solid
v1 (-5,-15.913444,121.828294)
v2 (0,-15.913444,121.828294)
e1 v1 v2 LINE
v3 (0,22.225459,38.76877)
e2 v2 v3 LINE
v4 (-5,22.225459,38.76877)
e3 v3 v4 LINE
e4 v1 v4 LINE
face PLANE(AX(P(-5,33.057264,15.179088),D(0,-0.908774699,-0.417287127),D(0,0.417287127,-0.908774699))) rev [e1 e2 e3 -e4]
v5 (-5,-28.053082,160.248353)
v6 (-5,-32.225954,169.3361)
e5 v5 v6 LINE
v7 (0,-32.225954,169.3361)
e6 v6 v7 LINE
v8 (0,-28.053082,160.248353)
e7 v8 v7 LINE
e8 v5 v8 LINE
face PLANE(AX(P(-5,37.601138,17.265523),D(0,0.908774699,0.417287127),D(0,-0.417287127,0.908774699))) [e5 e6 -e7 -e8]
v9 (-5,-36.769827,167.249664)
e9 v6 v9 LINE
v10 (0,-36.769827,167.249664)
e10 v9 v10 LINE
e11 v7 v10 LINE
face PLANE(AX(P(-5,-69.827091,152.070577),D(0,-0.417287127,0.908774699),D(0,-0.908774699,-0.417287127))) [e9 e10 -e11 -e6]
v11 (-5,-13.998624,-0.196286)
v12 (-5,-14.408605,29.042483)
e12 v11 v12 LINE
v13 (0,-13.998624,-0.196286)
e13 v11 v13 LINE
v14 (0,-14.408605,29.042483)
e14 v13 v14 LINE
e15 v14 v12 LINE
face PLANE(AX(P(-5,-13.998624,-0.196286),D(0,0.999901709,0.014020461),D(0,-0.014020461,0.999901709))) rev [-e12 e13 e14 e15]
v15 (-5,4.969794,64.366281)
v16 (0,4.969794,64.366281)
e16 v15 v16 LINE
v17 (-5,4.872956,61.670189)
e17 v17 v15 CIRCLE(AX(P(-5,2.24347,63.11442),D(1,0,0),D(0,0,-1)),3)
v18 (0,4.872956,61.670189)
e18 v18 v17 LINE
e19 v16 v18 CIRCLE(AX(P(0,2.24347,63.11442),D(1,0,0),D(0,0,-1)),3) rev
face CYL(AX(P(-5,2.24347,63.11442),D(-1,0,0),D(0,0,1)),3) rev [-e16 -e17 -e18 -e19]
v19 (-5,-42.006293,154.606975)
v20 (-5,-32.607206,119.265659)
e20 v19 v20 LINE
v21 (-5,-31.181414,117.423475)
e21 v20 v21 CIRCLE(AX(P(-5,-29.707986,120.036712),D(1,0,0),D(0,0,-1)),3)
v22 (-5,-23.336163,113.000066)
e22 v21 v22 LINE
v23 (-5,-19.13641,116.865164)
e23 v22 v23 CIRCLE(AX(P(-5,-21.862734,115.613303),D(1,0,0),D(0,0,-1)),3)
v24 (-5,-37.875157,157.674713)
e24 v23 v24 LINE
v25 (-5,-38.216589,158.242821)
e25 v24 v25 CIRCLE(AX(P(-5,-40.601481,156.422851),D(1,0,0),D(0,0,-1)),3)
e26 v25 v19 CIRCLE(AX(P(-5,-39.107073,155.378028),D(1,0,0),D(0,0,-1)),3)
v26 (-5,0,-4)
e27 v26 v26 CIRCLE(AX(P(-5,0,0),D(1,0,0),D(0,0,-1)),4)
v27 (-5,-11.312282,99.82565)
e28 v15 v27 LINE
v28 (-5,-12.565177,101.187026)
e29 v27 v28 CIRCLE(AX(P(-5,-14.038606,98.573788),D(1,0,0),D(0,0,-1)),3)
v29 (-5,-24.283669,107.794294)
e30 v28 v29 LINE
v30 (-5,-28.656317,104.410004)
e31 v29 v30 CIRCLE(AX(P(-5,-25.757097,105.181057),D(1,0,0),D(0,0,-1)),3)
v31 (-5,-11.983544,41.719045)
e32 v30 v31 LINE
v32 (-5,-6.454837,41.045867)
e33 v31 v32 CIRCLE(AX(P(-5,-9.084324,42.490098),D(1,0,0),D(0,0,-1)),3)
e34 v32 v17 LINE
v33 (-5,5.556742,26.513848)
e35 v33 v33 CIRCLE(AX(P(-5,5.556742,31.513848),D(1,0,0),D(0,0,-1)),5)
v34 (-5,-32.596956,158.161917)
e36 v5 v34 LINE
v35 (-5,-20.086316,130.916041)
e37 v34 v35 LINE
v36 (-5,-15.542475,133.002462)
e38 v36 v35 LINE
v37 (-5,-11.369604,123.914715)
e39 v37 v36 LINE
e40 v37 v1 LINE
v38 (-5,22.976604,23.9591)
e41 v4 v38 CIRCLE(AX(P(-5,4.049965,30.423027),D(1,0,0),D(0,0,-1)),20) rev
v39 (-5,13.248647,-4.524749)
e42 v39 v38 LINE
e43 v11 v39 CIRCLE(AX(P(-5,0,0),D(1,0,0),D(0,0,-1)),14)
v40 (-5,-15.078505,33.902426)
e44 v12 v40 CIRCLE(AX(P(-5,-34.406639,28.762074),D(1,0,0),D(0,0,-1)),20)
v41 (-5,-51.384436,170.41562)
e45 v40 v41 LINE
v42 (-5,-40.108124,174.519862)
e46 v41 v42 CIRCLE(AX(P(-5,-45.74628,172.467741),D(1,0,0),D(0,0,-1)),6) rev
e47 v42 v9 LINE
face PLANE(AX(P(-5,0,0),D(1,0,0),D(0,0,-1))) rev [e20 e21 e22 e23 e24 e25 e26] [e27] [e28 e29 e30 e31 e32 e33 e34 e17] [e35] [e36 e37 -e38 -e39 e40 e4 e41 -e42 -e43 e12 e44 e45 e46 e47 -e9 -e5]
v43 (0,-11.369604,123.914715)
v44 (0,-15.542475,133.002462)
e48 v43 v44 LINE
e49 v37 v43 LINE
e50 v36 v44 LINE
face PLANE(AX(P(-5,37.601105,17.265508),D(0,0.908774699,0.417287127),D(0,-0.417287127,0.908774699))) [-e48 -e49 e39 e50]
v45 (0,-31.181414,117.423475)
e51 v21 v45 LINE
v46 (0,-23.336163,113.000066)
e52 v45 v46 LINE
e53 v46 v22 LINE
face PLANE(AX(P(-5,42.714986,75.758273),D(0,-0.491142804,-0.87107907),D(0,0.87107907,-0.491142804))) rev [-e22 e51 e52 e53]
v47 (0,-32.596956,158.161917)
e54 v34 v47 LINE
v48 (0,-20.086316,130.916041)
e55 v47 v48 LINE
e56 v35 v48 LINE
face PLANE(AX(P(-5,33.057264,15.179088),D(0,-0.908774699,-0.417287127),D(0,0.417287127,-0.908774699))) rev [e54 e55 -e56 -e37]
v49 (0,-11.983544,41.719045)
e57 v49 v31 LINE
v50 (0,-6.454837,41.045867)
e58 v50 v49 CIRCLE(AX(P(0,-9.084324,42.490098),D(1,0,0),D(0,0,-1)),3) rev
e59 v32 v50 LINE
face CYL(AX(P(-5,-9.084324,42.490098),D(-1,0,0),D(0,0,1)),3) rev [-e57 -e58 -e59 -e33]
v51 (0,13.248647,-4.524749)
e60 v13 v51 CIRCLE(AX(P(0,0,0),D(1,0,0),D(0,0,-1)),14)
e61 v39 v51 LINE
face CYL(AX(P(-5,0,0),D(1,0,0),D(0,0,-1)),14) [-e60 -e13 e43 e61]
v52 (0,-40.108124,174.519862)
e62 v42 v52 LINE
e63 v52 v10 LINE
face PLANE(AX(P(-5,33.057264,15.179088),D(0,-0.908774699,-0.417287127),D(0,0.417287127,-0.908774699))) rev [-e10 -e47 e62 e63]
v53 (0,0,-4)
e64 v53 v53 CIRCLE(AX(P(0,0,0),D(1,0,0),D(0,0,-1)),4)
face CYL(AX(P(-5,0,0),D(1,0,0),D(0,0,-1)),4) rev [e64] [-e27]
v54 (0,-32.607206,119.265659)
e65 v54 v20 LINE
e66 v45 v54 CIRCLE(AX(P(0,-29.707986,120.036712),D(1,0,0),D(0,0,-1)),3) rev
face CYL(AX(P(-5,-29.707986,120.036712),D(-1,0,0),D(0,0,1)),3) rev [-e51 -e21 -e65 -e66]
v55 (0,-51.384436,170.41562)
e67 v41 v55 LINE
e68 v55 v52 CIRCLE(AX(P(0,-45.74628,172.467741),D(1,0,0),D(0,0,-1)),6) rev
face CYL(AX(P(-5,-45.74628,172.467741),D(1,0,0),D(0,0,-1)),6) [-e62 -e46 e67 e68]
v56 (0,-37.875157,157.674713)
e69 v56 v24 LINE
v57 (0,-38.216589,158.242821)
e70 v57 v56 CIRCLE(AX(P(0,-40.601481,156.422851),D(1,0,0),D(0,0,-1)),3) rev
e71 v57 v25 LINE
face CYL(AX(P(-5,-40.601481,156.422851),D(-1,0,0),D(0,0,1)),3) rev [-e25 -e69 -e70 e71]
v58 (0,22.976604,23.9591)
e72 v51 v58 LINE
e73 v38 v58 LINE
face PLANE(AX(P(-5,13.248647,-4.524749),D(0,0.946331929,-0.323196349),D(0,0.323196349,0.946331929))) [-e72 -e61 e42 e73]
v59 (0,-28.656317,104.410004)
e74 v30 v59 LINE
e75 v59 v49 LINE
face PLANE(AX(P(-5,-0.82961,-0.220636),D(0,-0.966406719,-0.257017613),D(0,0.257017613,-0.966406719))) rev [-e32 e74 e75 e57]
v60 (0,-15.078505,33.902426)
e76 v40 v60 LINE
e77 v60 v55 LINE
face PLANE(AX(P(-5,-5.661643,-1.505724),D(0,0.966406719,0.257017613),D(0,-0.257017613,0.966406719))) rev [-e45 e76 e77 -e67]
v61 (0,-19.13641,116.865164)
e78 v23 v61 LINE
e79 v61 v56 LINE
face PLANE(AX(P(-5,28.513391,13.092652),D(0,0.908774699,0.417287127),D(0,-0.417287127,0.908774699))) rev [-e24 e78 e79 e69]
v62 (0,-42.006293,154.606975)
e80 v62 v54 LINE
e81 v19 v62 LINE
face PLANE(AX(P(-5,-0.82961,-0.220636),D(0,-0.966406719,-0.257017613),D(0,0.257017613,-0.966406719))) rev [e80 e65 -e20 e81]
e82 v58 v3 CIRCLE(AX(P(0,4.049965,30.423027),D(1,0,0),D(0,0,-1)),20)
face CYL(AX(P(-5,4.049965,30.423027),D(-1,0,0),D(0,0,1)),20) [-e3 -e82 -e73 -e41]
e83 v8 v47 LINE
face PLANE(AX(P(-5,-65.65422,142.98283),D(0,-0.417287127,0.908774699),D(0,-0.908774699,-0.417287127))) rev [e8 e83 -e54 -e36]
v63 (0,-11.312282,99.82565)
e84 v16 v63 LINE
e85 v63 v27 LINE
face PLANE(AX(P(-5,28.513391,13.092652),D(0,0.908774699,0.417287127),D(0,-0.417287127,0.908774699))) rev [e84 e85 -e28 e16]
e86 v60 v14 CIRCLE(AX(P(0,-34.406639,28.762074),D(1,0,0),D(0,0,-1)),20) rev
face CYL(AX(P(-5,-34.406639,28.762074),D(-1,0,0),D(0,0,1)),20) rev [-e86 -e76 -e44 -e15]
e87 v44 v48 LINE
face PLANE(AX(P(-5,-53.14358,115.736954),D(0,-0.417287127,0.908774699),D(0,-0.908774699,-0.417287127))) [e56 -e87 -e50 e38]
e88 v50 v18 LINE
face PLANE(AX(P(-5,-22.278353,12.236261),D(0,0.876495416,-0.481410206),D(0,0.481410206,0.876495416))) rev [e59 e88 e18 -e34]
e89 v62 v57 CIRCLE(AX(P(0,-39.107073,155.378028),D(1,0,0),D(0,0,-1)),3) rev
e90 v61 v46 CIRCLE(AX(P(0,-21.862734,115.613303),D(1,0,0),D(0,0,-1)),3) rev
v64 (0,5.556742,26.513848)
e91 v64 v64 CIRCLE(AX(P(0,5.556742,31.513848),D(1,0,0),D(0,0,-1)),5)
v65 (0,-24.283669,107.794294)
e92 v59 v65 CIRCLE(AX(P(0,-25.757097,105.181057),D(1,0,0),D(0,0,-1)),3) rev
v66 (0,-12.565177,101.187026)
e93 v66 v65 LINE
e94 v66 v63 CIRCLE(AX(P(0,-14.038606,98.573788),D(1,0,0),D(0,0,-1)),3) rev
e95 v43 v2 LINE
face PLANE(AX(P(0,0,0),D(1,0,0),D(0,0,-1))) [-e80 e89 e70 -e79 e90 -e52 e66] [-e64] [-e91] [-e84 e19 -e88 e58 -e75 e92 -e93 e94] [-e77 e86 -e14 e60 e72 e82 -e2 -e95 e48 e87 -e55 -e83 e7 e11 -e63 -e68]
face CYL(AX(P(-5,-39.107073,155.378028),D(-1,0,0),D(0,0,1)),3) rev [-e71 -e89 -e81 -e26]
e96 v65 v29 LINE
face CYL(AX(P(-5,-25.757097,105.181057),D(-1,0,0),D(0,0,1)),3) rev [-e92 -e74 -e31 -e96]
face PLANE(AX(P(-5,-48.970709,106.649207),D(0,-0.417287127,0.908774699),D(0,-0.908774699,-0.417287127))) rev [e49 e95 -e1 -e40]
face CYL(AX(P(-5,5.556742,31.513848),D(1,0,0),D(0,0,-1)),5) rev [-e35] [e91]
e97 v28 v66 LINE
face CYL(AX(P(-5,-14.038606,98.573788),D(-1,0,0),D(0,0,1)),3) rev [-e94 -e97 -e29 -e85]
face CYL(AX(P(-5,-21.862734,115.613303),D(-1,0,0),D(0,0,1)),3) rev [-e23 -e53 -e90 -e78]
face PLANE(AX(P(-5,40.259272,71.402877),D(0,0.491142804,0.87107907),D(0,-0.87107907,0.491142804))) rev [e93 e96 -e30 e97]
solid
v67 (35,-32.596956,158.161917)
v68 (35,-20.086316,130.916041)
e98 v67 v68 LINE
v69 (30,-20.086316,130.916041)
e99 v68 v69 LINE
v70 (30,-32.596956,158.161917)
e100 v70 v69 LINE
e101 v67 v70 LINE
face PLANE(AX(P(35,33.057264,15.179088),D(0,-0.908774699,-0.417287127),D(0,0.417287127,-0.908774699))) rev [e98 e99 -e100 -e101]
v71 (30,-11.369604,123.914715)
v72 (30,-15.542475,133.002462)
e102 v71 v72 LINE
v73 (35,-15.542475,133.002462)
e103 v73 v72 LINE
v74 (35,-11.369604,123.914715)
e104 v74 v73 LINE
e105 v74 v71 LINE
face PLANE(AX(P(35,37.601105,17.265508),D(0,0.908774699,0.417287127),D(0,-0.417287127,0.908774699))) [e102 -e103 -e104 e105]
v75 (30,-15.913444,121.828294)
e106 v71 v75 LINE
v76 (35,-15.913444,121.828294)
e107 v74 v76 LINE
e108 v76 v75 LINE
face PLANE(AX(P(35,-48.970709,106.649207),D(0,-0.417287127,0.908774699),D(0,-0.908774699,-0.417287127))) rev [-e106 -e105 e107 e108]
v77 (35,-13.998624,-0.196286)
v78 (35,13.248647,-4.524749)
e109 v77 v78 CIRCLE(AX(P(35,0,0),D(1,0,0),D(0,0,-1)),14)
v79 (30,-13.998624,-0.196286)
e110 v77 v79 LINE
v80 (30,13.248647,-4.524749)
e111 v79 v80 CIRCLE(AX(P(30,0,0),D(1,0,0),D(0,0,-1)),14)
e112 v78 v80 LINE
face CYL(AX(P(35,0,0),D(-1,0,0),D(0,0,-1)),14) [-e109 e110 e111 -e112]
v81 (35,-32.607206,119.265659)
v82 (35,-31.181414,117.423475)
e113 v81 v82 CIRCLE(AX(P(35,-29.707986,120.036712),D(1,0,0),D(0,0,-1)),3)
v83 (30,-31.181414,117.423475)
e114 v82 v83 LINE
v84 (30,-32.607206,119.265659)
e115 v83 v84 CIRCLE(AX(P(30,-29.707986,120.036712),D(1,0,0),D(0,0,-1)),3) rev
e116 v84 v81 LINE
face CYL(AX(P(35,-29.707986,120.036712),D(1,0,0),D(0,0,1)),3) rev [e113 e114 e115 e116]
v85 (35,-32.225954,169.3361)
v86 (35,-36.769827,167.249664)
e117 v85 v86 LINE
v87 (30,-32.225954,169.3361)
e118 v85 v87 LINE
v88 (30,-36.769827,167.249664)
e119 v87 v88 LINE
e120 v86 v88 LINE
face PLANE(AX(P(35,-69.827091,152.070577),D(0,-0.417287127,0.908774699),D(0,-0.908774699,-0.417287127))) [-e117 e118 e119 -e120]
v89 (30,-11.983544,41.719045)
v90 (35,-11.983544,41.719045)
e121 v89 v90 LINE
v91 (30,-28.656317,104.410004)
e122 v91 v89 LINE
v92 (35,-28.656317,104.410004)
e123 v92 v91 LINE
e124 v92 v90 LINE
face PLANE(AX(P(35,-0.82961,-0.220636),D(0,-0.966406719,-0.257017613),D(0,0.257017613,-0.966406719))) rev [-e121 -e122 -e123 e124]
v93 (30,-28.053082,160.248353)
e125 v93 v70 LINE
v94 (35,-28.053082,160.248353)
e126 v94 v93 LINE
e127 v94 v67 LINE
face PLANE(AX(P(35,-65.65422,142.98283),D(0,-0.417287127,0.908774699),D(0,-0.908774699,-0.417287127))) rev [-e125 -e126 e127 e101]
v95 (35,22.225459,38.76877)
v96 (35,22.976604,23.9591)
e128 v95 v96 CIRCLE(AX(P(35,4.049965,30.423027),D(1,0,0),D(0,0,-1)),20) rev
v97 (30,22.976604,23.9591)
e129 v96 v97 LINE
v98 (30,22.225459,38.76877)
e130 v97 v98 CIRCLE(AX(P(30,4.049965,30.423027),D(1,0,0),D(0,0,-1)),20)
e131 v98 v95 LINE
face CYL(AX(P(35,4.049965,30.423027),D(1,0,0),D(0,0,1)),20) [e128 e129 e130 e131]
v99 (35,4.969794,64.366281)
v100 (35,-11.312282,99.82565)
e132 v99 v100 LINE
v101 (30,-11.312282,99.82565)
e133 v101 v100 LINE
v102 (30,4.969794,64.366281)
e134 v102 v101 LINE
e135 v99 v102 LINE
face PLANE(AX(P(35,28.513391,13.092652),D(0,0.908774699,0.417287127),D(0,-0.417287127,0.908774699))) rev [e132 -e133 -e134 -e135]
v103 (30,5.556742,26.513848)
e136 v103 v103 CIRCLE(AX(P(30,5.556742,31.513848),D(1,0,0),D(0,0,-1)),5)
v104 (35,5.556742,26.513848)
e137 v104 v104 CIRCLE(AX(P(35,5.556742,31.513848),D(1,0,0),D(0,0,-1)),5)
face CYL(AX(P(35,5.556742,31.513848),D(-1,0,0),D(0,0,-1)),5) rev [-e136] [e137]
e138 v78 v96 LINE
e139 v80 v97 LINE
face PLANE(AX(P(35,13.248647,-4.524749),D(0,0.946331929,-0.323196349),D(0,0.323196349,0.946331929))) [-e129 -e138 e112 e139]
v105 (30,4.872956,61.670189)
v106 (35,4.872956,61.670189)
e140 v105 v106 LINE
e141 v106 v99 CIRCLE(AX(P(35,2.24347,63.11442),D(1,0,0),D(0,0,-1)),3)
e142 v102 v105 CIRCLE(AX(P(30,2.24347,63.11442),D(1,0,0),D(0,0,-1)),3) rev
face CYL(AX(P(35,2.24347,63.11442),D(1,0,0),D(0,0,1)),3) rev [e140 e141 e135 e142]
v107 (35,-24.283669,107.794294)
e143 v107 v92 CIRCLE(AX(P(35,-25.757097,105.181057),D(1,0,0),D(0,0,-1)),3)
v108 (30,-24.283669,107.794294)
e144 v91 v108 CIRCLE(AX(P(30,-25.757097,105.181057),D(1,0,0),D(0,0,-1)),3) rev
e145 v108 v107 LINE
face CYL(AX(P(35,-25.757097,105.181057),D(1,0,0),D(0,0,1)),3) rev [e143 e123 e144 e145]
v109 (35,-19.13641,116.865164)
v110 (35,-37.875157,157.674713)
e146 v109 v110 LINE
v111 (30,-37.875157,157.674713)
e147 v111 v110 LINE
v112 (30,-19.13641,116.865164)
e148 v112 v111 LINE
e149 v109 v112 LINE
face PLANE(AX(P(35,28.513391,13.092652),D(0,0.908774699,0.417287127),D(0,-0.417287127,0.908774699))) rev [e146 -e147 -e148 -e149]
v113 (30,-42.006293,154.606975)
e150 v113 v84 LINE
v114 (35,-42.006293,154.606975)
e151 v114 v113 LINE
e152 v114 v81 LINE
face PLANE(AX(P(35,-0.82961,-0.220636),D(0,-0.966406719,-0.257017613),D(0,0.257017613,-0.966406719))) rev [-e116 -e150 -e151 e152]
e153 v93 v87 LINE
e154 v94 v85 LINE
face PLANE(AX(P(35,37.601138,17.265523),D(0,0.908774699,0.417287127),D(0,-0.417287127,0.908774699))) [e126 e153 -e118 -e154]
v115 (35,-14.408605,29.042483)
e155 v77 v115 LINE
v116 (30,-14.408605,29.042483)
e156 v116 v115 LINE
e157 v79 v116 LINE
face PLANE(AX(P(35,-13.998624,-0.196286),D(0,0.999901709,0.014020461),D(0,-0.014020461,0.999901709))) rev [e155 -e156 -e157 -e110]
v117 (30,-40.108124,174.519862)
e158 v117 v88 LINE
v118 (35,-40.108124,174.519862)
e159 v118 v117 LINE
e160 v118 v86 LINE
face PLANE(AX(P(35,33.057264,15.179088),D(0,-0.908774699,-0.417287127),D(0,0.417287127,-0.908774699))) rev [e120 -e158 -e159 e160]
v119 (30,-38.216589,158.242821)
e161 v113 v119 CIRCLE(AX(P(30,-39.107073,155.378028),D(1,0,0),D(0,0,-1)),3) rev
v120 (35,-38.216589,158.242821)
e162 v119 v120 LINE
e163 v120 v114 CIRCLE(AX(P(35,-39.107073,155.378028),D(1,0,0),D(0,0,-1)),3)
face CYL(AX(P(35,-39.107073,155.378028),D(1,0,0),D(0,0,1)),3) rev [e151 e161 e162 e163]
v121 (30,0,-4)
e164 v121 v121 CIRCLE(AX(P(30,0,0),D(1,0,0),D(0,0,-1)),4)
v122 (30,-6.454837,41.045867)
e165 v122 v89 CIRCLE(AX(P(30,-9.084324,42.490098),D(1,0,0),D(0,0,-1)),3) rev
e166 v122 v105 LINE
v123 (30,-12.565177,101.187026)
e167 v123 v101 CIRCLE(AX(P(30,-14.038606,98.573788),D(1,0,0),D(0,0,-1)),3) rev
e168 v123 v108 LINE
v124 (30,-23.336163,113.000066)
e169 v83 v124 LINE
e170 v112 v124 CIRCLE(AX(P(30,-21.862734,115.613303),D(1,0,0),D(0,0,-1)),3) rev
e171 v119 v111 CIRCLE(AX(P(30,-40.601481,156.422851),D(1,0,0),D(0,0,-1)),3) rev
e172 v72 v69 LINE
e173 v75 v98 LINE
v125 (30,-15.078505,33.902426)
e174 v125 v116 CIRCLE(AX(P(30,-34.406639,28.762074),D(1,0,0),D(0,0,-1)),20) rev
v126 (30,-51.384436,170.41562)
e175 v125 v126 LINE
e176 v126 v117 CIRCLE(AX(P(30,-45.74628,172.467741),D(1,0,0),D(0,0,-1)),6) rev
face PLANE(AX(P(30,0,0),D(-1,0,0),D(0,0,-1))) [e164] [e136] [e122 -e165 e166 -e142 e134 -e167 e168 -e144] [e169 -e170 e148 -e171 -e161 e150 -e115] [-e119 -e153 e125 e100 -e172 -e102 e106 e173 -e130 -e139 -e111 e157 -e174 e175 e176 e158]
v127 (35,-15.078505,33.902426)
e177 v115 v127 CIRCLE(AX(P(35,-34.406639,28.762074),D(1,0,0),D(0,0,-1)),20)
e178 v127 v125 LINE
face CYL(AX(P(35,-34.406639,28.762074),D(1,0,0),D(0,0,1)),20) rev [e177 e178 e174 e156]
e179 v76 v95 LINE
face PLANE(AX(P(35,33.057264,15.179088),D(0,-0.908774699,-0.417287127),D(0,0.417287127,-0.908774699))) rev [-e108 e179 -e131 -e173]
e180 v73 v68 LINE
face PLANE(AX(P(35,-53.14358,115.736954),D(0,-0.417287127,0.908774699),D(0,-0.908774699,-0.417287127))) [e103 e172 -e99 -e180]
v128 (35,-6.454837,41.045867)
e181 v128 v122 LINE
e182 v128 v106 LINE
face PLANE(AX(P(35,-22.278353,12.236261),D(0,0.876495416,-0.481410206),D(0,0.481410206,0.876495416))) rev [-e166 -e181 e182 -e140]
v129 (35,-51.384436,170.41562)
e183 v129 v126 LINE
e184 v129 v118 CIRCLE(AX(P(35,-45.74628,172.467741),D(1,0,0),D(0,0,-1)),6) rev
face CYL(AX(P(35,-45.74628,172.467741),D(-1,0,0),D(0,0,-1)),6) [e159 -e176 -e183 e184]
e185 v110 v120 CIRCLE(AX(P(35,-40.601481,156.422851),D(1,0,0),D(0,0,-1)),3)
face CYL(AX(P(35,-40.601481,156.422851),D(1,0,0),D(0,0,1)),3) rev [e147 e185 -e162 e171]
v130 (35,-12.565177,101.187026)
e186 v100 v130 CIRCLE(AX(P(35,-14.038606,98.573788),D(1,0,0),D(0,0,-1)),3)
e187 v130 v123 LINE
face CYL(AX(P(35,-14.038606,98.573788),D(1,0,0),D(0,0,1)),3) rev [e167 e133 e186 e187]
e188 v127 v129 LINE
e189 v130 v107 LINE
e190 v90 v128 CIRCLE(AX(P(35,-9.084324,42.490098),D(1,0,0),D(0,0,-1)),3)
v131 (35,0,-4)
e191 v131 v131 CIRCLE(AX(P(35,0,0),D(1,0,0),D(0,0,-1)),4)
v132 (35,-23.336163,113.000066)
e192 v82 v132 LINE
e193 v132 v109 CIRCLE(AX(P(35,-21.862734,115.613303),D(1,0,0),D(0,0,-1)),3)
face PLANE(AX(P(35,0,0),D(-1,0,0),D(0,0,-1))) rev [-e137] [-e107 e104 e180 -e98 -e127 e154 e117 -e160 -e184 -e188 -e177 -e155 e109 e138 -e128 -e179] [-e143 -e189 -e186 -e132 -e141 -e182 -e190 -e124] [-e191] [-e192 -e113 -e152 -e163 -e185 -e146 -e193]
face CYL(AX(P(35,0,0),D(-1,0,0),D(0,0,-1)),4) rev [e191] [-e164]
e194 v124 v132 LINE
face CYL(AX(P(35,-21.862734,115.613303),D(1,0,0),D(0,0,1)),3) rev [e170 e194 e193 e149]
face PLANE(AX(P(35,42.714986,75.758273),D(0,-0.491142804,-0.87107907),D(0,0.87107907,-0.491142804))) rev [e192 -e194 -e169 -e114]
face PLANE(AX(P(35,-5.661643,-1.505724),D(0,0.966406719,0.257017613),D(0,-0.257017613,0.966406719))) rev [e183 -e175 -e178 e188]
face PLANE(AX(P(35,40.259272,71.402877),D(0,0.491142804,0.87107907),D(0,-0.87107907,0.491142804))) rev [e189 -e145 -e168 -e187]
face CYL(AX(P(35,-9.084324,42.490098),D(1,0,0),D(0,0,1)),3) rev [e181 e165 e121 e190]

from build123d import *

# Parameters (mm, degrees)
SKETCH1_R           = 4
SKETCH1_R_2         = 5
BOSS_EXTRUDE1_DEPTH = 5
FILLET3_R           = 20
FILLET6_R           = 3


with BuildPart() as part:
    # Sketch1 → Boss-Extrude1 (new body)
    # profile 1 of 3: a face of its own
    with BuildSketch(Plane.YZ):
        with BuildLine():
            Line((-14.443258315, 31.513848096), (-13.998623919, -0.196286448))
            ThreePointArc((-13.998623919, -0.196286448), (-2.196477435, -13.826622396), (13.248647006, -4.52474889))
            Line((13.248647006, -4.52474889), (25.556741685, 31.513848096))
            Line((25.556741685, 31.513848096), (-15.913444308, 121.828294459))
            Line((-15.913444308, 121.828294459), (-17.991906384, 126.354803013))
            Line((-17.991906384, 126.354803013), (-20.086315573, 130.916041451))
            Line((-20.086315573, 130.916041451), (-32.596955812, 158.161917487))
            Line((-32.596955812, 158.161917487), (-34.683391444, 162.705790984))
            Line((-34.683391444, 162.705790984), (-36.769827077, 167.24966448))
            Line((-36.769827077, 167.24966448), (-40.108124089, 174.519862074))
            ThreePointArc((-40.108124089, 174.519862074), (-47.798400673, 178.105896939), (-51.384435538, 170.415620354))
            Line((-51.384435538, 170.415620354), (-14.443258315, 31.513848096))
        make_face()
        with Locations(Location((0, 0, 0), (0, 0, 270))):
            Circle(SKETCH1_R, mode=Mode.SUBTRACT)
        with Locations(Location((5.556741685, 31.513848096, 0), (0, 0, 270))):
            Circle(SKETCH1_R_2, mode=Mode.SUBTRACT)
        Polygon((-10.059219018, 34.483430451), (-30.486505123, 111.291655193), (-11.718080145, 100.709404741), (5.599975549, 62.99386104), align=None, mode=Mode.SUBTRACT)
        Polygon((-38.215011053, 158.414852351), (-15.274502195, 108.454638594), (-32.282363467, 118.044225778), (-44.116299331, 162.540768328), align=None, mode=Mode.SUBTRACT)
    # profile 2 of 3: a face of its own
    with BuildSketch(Plane.YZ):
        Polygon((-17.991906384, 126.354803013), (-15.913444308, 121.828294459), (-11.369603993, 123.914714855), (-15.542475258, 133.002461848), (-20.086315573, 130.916041451), align=None)
    # profile 3 of 3: a face of its own
    with BuildSketch(Plane.YZ):
        Polygon((-32.22595358, 169.336100113), (-36.769827077, 167.24966448), (-34.683391444, 162.705790984), (-32.596955812, 158.161917487), (-28.053082315, 160.24835312), align=None)
    extrude(amount=-BOSS_EXTRUDE1_DEPTH)

    # Fillet3
    fillet3_edges = [part.edges().sort_by_distance(p)[0] for p in [
        (-2.5, 25.556741685, 31.513848096),
        (-2.5, -14.443258315, 31.513848096),
    ]]
    fillet(fillet3_edges, radius=FILLET3_R)

    # Fillet6
    # the kernel refuses this fillet: 3 mm, written as the material it adds along each edge
    with BuildSketch(Plane(origin=(0, -38.215011053, 158.414852351), x_dir=(0, 0.41728712651347166, -0.9087746992770703), z_dir=(-1, 0, 0))) as fillet6_piece_1:
        with BuildLine():
            CenterArc((FILLET6_R * 0.271478941521, FILLET6_R), FILLET6_R, 239.62294962, 30.37705038)
            Line((-FILLET6_R * 0.23420930525, FILLET6_R * 0.137283709973), (0, 0))
            Line((0, 0), (FILLET6_R * 0.271478941521, 0))
        make_face()
    extrude(amount=5)
    with BuildSketch(Plane(origin=(0, -32.282363467, 118.044225778), x_dir=(0, 0.8710790696902164, -0.49114280443433855), z_dir=(-1, 0, 0))) as fillet6_piece_2:
        with BuildLine():
            CenterArc((FILLET6_R * 0.421297147858, -FILLET6_R), FILLET6_R, 90, 45.691106369)
            Line((-FILLET6_R * 0.294287167004, -FILLET6_R * 0.301473630904), (0, 0))
            Line((0, 0), (FILLET6_R * 0.421297147858, 0))
        make_face()
    extrude(amount=5)
    with BuildSketch(Plane(origin=(0, -30.486505123, 111.291655193), x_dir=(0, 0.25701761253564515, -0.9664067191645953), z_dir=(-1, 0, 0))) as fillet6_piece_3:
        with BuildLine():
            CenterArc((FILLET6_R * 2.37362157585, -FILLET6_R), FILLET6_R, 90, 134.308893631)
            Line((FILLET6_R * 1.65803726099, -FILLET6_R * 1.6985263691), (0, 0))
            Line((0, 0), (FILLET6_R * 2.37362157585, 0))
        make_face()
    extrude(amount=5)
    with BuildSketch(Plane(origin=(0, -11.718080145, 100.709404741), x_dir=(0, -0.8710790696902125, 0.4911428044343457), z_dir=(-1, 0, 0))) as fillet6_piece_4:
        with BuildLine():
            CenterArc((FILLET6_R * 0.324156203472, -FILLET6_R), FILLET6_R, 90, 35.920846961)
            Line((-FILLET6_R * 0.262510846562, -FILLET6_R * 0.190171763641), (0, 0))
            Line((0, 0), (FILLET6_R * 0.324156203472, 0))
        make_face()
    extrude(amount=5)
    with BuildSketch(Plane(origin=(0, -10.059219018, 34.483430451), x_dir=(0, -0.2570176125356449, 0.9664067191645953), z_dir=(-1, 0, 0))) as fillet6_piece_5:
        with BuildLine():
            CenterArc((FILLET6_R * 2.49571060233, FILLET6_R), FILLET6_R, 133.670716463, 136.329283537)
            Line((FILLET6_R * 1.80519778573, FILLET6_R * 1.72332015741), (0, 0))
            Line((0, 0), (FILLET6_R * 2.49571060233, 0))
        make_face()
    extrude(amount=5)
    with BuildSketch(Plane(origin=(0, 5.599975549, 62.99386104), x_dir=(0, -0.41728712651347205, 0.9087746992770702), z_dir=(-1, 0, 0))) as fillet6_piece_6:
        with BuildLine():
            CenterArc((FILLET6_R * 0.503395718442, -FILLET6_R), FILLET6_R, 90, 53.440975871)
            Line((-FILLET6_R * 0.299847949894, -FILLET6_R * 0.404349423506), (0, 0))
            Line((0, 0), (FILLET6_R * 0.503395718442, 0))
        make_face()
    extrude(amount=5)
    with BuildSketch(Plane(origin=(0, -15.274502195, 108.454638594), x_dir=(0, -0.4172871265134709, 0.9087746992770708), z_dir=(-1, 0, 0))) as fillet6_piece_7:
        with BuildLine():
            CenterArc((FILLET6_R * 3.08493247789, -FILLET6_R), FILLET6_R, 90, 144.079153039)
            Line((FILLET6_R * 2.49826542786, -FILLET6_R * 1.80982823636), (0, 0))
            Line((0, 0), (FILLET6_R * 3.08493247789, 0))
        make_face()
    extrude(amount=5)
    with BuildSketch(Plane(origin=(0, -44.116299331, 162.540768328), x_dir=(0, 0.2570176125356455, -0.9664067191645951), z_dir=(-1, 0, 0))) as fillet6_piece_8:
        with BuildLine():
            CenterArc((FILLET6_R * 2.73652664972, -FILLET6_R), FILLET6_R, 90, 139.852690212)
            Line((FILLET6_R * 2.09177163516, -FILLET6_R * 1.76438927988), (0, 0))
            Line((0, 0), (FILLET6_R * 2.73652664972, 0))
        make_face()
    extrude(amount=5)


with BuildPart() as body_2:
    # Mirror4: mirrored copy
    add(part.part.mirror(Plane(origin=(15, 0, 0), x_dir=(0, 0, 1), z_dir=(1, 0, 0))))


solid = Compound([part.part, body_2.part])
